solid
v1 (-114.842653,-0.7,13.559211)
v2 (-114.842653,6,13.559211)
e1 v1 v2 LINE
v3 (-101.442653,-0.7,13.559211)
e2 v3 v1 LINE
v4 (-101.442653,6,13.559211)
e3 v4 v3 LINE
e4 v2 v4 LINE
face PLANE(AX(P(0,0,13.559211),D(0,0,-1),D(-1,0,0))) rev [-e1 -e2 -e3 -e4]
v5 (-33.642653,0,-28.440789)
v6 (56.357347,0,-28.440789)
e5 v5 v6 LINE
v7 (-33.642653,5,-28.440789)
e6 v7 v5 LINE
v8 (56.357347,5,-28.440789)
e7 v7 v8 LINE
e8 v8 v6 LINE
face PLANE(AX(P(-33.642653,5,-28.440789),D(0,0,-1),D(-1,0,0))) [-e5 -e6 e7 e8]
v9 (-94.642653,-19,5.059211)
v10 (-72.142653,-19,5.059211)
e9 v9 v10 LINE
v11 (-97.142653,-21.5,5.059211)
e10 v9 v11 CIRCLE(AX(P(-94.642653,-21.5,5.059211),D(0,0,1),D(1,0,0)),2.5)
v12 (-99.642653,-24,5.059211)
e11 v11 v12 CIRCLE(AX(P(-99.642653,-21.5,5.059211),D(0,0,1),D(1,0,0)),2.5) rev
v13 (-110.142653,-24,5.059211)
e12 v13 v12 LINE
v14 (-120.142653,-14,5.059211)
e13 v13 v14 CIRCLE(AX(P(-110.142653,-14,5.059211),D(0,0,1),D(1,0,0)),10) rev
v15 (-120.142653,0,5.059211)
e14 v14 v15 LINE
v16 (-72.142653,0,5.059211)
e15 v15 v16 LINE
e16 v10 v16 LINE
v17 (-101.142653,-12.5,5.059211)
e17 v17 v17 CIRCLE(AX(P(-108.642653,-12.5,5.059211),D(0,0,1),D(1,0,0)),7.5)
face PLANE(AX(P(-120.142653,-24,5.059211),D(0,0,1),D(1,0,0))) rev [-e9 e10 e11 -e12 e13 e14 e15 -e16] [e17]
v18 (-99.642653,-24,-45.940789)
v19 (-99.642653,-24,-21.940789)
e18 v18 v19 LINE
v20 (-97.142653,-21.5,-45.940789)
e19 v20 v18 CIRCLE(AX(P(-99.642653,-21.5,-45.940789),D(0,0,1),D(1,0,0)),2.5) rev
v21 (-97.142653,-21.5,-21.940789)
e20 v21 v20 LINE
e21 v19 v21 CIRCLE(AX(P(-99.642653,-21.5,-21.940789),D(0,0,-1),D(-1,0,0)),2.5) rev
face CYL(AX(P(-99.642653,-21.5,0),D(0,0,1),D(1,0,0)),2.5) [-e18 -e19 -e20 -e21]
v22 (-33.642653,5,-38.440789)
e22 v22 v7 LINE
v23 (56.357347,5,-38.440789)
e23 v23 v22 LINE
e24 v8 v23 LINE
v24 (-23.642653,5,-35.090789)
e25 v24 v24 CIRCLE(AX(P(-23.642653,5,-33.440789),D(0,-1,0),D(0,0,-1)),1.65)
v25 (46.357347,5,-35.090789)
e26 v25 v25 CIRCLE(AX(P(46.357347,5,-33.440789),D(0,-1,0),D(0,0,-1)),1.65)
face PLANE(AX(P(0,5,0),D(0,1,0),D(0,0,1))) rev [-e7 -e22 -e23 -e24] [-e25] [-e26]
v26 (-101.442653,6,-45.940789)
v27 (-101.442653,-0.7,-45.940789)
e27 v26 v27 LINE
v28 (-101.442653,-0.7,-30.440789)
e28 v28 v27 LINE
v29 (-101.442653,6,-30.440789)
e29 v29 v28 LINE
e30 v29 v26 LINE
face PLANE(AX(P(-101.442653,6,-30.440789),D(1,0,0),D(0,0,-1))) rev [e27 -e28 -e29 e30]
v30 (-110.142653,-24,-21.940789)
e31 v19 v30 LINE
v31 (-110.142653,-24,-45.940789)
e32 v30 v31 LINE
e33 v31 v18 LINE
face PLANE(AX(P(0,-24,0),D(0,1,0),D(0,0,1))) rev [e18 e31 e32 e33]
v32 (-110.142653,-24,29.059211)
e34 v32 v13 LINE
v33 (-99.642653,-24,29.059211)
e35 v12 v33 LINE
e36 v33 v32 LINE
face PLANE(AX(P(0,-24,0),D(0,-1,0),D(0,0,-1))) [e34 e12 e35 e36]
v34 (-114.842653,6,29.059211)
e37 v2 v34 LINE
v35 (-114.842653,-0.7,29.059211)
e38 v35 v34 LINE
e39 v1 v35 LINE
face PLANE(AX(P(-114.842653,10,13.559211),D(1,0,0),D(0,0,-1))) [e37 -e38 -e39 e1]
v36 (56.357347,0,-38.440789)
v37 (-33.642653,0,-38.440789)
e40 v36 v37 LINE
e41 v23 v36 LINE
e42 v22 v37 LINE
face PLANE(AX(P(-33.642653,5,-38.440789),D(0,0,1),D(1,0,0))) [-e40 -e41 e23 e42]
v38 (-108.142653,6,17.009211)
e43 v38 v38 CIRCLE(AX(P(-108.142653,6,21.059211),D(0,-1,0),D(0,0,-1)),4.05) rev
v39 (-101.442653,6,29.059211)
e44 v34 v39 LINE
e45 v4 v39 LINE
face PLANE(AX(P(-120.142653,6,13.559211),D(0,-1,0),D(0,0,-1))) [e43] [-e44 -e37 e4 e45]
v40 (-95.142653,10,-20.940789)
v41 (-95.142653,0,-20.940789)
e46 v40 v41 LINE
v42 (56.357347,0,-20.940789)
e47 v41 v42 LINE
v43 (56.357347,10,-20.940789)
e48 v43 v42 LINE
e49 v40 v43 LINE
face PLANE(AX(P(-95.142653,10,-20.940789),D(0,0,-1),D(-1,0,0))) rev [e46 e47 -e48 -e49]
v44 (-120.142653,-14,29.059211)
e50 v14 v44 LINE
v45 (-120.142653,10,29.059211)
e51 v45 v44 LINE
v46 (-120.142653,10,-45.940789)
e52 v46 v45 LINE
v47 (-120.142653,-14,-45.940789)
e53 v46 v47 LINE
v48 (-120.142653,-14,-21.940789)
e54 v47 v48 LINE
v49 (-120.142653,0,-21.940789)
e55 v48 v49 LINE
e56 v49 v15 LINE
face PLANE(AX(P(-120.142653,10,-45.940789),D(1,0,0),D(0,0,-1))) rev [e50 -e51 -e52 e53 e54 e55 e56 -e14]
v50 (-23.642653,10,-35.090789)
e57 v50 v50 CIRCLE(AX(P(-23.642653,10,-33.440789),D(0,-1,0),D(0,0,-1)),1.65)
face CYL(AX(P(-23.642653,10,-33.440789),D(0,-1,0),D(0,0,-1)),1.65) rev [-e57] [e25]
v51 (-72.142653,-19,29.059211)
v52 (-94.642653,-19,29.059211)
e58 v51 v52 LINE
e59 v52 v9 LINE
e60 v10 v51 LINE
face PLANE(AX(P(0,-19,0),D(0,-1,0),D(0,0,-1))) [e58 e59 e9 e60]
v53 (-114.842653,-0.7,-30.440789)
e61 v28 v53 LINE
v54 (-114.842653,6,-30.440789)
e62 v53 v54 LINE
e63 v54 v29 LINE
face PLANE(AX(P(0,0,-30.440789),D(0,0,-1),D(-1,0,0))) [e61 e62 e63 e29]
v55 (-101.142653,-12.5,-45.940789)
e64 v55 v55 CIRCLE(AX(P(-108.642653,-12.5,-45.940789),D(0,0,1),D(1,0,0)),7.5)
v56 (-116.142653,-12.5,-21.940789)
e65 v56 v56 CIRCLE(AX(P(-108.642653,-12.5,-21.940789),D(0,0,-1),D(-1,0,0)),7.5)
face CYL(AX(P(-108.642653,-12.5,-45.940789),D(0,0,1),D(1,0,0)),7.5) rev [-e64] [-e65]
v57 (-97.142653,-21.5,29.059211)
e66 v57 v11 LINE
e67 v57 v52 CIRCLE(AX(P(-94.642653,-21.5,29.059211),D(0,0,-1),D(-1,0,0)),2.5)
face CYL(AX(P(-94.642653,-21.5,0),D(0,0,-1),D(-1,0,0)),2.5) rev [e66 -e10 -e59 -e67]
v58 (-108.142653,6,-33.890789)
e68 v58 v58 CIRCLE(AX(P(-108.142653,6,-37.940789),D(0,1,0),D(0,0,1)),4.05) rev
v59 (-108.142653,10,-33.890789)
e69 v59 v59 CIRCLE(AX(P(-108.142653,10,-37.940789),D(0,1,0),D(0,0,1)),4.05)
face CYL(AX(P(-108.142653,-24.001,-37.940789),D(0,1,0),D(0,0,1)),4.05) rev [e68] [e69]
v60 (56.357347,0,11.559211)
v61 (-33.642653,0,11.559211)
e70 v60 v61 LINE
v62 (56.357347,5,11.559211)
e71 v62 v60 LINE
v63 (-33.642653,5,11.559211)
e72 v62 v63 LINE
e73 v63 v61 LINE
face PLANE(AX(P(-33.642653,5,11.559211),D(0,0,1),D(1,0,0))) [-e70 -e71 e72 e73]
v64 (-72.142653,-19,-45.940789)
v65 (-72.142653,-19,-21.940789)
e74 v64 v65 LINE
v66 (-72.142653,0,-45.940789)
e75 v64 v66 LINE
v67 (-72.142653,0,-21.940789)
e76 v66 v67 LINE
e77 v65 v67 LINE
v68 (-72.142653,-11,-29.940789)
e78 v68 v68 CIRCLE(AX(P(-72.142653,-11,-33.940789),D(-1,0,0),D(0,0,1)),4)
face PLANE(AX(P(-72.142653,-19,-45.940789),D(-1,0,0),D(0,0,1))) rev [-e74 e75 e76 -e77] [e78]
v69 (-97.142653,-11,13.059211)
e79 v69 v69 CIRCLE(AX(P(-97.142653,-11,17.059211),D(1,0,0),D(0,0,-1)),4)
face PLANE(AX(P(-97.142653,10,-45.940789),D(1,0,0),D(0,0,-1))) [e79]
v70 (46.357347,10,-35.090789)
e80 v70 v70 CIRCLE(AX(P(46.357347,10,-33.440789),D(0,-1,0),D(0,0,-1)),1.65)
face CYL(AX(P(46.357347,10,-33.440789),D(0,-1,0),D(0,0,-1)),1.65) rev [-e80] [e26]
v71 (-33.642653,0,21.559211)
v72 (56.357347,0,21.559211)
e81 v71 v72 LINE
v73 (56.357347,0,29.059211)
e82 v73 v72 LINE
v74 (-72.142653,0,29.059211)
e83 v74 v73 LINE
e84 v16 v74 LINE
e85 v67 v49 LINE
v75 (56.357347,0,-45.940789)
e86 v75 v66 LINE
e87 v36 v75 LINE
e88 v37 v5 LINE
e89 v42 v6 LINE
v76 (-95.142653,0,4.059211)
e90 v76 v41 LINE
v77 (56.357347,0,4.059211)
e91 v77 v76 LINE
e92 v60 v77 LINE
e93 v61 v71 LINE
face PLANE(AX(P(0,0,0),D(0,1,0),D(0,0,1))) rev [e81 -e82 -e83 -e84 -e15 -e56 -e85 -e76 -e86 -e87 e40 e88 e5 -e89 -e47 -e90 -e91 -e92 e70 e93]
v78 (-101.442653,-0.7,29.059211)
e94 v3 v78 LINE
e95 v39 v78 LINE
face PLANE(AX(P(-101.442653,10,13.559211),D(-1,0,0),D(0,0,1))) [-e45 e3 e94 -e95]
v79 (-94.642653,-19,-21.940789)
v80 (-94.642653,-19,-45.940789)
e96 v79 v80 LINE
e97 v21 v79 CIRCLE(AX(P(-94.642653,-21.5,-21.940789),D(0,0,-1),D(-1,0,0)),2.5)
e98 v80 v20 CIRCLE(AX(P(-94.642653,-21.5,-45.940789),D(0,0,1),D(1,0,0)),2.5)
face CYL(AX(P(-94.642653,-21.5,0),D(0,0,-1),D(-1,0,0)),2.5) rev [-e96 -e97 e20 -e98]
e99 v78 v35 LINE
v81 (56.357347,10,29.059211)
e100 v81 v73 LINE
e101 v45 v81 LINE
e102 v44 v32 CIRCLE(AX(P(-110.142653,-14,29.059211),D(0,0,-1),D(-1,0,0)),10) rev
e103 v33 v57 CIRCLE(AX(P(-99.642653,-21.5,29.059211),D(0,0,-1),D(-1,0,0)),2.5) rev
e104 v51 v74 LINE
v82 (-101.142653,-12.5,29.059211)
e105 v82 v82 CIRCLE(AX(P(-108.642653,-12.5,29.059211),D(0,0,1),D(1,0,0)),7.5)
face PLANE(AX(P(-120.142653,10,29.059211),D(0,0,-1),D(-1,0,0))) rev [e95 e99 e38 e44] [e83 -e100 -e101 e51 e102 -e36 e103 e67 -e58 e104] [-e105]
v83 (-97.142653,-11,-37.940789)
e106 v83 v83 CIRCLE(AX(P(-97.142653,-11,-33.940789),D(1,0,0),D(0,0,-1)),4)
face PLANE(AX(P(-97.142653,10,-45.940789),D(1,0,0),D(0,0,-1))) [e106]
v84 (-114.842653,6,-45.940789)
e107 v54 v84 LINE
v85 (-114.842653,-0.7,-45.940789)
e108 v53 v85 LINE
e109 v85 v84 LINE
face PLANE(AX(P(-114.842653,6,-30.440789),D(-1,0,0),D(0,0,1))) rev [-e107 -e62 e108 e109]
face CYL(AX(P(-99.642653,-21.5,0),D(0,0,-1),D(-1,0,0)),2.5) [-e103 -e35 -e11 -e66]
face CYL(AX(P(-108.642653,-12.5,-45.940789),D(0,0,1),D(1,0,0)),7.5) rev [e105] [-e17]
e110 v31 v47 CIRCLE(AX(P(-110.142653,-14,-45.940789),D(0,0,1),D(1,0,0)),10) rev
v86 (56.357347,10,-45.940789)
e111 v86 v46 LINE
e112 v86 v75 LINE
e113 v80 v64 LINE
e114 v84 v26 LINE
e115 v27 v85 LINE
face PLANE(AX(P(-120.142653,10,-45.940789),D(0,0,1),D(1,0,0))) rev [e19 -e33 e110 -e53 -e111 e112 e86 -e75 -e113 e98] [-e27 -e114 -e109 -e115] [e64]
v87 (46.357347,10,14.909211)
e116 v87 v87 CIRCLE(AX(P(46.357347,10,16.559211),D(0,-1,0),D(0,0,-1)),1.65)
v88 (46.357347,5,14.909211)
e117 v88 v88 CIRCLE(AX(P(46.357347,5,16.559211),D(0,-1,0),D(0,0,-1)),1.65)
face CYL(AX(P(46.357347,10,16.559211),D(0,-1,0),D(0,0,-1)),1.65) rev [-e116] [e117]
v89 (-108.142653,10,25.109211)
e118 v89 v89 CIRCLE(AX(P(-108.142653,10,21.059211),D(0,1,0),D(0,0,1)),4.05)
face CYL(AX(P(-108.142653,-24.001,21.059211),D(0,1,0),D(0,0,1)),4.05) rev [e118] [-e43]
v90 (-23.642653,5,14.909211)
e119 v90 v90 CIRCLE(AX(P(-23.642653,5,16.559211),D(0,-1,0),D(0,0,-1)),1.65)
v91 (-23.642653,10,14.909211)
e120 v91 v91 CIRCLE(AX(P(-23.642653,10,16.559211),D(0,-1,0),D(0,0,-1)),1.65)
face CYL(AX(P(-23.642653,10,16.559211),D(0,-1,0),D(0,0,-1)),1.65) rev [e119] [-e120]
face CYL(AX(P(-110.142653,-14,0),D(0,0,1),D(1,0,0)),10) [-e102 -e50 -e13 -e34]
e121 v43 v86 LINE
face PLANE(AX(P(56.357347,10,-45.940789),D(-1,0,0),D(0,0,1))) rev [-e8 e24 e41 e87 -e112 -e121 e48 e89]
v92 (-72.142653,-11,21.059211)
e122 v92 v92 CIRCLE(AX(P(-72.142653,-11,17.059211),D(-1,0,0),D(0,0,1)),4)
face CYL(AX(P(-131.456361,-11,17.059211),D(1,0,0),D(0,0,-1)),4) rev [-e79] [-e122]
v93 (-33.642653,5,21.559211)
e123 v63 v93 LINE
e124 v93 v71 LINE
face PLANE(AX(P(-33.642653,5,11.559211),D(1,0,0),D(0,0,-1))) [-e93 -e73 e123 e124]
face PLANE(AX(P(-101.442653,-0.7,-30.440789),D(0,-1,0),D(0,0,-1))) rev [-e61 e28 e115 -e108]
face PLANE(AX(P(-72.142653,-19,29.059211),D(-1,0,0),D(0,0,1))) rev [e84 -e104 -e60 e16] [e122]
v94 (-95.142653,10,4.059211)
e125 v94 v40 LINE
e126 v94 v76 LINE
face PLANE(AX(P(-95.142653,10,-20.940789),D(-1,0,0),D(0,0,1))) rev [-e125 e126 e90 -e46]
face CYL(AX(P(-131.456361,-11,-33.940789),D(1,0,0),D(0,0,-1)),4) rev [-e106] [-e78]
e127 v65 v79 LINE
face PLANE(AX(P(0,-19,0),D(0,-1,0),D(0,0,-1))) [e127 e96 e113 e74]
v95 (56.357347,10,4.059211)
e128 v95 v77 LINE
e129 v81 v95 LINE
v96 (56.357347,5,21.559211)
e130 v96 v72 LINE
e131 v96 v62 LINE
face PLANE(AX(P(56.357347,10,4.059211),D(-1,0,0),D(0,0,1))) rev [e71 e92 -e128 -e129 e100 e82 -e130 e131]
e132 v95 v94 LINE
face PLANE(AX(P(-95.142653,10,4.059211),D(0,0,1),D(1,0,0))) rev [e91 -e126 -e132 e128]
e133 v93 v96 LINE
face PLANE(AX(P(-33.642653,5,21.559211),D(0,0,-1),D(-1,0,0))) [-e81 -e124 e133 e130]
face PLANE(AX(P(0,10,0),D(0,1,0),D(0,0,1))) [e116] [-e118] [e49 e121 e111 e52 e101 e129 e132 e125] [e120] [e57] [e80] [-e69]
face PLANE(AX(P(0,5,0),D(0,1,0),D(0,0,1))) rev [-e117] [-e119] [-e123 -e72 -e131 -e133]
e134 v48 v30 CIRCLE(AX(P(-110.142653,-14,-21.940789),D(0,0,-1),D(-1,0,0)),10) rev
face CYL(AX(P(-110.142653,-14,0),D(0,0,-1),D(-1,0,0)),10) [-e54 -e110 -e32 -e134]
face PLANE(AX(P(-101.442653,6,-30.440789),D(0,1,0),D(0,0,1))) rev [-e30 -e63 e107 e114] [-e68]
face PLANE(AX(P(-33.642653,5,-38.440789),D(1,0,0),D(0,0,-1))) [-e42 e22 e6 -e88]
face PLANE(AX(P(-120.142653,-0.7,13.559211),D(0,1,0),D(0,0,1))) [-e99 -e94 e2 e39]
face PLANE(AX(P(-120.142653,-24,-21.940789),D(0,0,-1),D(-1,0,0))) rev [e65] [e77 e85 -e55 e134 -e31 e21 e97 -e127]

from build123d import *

# Parameters (mm, degrees)
BOSS_EXTRUDE1_DEPTH = 10
SKETCH2_W           = 90
SKETCH2_H           = 10
CUT_EXTRUDE1_DEPTH  = 5
SKETCH3_R           = 1.65
CUT_EXTRUDE2_DEPTH  = 129.723786073
SKETCH5_W           = 23
SKETCH5_H           = 24
BOSS_EXTRUDE2_DEPTH = 24
SKETCH6_R           = 7.5
CUT_EXTRUDE3_DEPTH  = 144.649772109
SKETCH7_W           = 25
SKETCH7_H           = 24
BOSS_EXTRUDE3_DEPTH = 19
SKETCH8_R           = 4
CUT_EXTRUDE4_DEPTH  = 25
FILLET2_R           = 10
SKETCH12_W          = 13.4
SKETCH12_H          = 6.7
CUT_EXTRUDE5_DEPTH  = 15.5
CUT_EXTRUDE6_START  = -75
SKETCH12_2_W        = 13.4
SKETCH12_2_H        = 6.7
CUT_EXTRUDE6_DEPTH  = 15.5
CUT_EXTRUDE7_REACH  = 135.044
SKETCH13_R          = 4.05
FILLET3_R           = 2.5


with BuildPart() as part:
    # Sketch1 → Boss-Extrude1 (new body)
    with BuildSketch(Plane(origin=(0, 0, 0), x_dir=(1, 0, 0), z_dir=(0, 1, 0))):
        Polygon((-120.142652821, 45.940788785), (56.357347179, 45.940788785), (56.357347179, 20.940788785), (-95.142652821, 20.940788785), (-95.142652821, -4.059211215), (56.357347179, -4.059211215), (56.357347179, -29.059211215), (-120.142652821, -29.059211215), align=None)
    extrude(amount=BOSS_EXTRUDE1_DEPTH)

    # Sketch2 → Cut-Extrude1 (cut)
    with BuildSketch(Plane(origin=(0, 0, 0), x_dir=(1, 0, 0), z_dir=(0, 1, 0))):
        with Locations((11.357347179, 33.440788785)):
            Rectangle(SKETCH2_W, SKETCH2_H)
        with Locations((11.357347179, -16.559211215)):
            Rectangle(SKETCH2_W, SKETCH2_H)
    extrude(amount=CUT_EXTRUDE1_DEPTH, mode=Mode.SUBTRACT)

    # Sketch3 → Cut-Extrude2 (cut, through all)
    with BuildSketch(Plane(origin=(0, 5, 0), x_dir=(-1, 0, 0), z_dir=(0, -1, 0))):
        with Locations(Location((23.642652821, 33.440788785, 0), (0, 0, 90))):
            Circle(SKETCH3_R)
        with Locations(Location((-46.357347179, 33.440788785, 0), (0, 0, 90))):
            Circle(SKETCH3_R)
        with Locations(Location((23.642652821, -16.559211215, 0), (0, 0, 90))):
            Circle(SKETCH3_R)
        with Locations(Location((-46.357347179, -16.559211215, 0), (0, 0, 90))):
            Circle(SKETCH3_R)
    extrude(amount=-CUT_EXTRUDE2_DEPTH, mode=Mode.SUBTRACT)

    # Sketch5 → Boss-Extrude2 (add)
    with BuildSketch(Plane.XZ):
        with Locations((-108.642652821, 17.059211215)):
            Rectangle(SKETCH5_W, SKETCH5_H)
        with Locations((-108.642652821, -33.940788785)):
            Rectangle(SKETCH5_W, SKETCH5_H)
    extrude(amount=BOSS_EXTRUDE2_DEPTH)

    # Sketch6 → Cut-Extrude3 (cut, through all)
    with BuildSketch(Plane.XY.offset(29.059211215)):
        with Locations((-108.642652821, -12.5)):
            Circle(SKETCH6_R)
    extrude(amount=-CUT_EXTRUDE3_DEPTH, mode=Mode.SUBTRACT)

    # Sketch7 → Boss-Extrude3 (add)
    with BuildSketch(Plane.XZ):
        with Locations((-84.642652821, -33.940788785)):
            Rectangle(SKETCH7_W, SKETCH7_H)
        with Locations((-84.642652821, 17.059211215)):
            Rectangle(SKETCH7_W, SKETCH7_H)
    extrude(amount=BOSS_EXTRUDE3_DEPTH)

    # Sketch8 → Cut-Extrude4 (cut)
    with BuildSketch(Plane.ZY.offset(72.142652821)):
        with Locations(Location((-33.940788785, -11, 0), (0, 0, 180))):
            Circle(SKETCH8_R)
        with Locations(Location((17.059211215, -11, 0), (0, 0, 180))):
            Circle(SKETCH8_R)
    extrude(amount=CUT_EXTRUDE4_DEPTH, mode=Mode.SUBTRACT)

    # Fillet2
    fillet2_edges = [part.edges().sort_by_distance(p)[0] for p in [
        (-120.142652821, -24, 17.059211215),
        (-120.142652821, -24, -33.940788785),
    ]]
    fillet(fillet2_edges, radius=FILLET2_R)

    # Sketch12 → Cut-Extrude5 (cut)
    with BuildSketch(Plane(origin=(0, 0, -45.940788785), x_dir=(-1, 0, 0), z_dir=(0, 0, -1))):
        with Locations((108.142652821, 2.65)):
            Rectangle(SKETCH12_W, SKETCH12_H)
    extrude(amount=-CUT_EXTRUDE5_DEPTH, mode=Mode.SUBTRACT)

    # Sketch12<2> → Cut-Extrude6 (cut)
    with BuildSketch(Plane(origin=(0, 0, -45.940788785), x_dir=(-1, 0, 0), z_dir=(0, 0, -1)).offset(CUT_EXTRUDE6_START)):
        with Locations((108.142652821, 2.65)):
            Rectangle(SKETCH12_2_W, SKETCH12_2_H)
    extrude(amount=CUT_EXTRUDE6_DEPTH, mode=Mode.SUBTRACT)

    # Sketch13 → Cut-Extrude7 (cut, up to next)
    with BuildSketch(Plane(origin=(0, 10, 0), x_dir=(1, 0, 0), z_dir=(0, 1, 0)), mode=Mode.PRIVATE) as cut_extrude7_sk1:
        with Locations(Location((-108.142652821, 37.940788785, 0), (0, 0, 270))):
            Circle(SKETCH13_R)
    cut_extrude7_tool1 = extrude(cut_extrude7_sk1.sketch, amount=-CUT_EXTRUDE7_REACH, mode=Mode.PRIVATE) & part.part
    # Sketch13 → Cut-Extrude7 (cut, up to next)
    with BuildSketch(Plane(origin=(0, 10, 0), x_dir=(1, 0, 0), z_dir=(0, 1, 0)), mode=Mode.PRIVATE) as cut_extrude7_sk2:
        with Locations(Location((-108.142652821, -21.059211215, 0), (0, 0, 270))):
            Circle(SKETCH13_R)
    cut_extrude7_tool2 = extrude(cut_extrude7_sk2.sketch, amount=-CUT_EXTRUDE7_REACH, mode=Mode.PRIVATE) & part.part
    add(cut_extrude7_tool1.solids().sort_by_distance((-108.142653, 10, -37.940789))[0], mode=Mode.SUBTRACT)
    add(cut_extrude7_tool2.solids().sort_by_distance((-108.142653, 10, 21.059211))[0], mode=Mode.SUBTRACT)

    # Fillet3
    fillet3_edges = [part.edges().sort_by_distance(p)[0] for p in [
        (-97.142652821, -19, -33.940788785),
        (-97.142652821, -19, 17.059211215),
    ]]
    fillet(fillet3_edges, radius=FILLET3_R)
    fillet3_2_edges = [part.edges().sort_by_distance(p)[0] for p in [
        (-97.142652821, -24, -33.940788785),
        (-97.142652821, -24, 17.059211215),
    ]]
    fillet(fillet3_2_edges, radius=FILLET3_R - 0.0001)  # a hair under: the kernel refuses the full size


solid = part.part
